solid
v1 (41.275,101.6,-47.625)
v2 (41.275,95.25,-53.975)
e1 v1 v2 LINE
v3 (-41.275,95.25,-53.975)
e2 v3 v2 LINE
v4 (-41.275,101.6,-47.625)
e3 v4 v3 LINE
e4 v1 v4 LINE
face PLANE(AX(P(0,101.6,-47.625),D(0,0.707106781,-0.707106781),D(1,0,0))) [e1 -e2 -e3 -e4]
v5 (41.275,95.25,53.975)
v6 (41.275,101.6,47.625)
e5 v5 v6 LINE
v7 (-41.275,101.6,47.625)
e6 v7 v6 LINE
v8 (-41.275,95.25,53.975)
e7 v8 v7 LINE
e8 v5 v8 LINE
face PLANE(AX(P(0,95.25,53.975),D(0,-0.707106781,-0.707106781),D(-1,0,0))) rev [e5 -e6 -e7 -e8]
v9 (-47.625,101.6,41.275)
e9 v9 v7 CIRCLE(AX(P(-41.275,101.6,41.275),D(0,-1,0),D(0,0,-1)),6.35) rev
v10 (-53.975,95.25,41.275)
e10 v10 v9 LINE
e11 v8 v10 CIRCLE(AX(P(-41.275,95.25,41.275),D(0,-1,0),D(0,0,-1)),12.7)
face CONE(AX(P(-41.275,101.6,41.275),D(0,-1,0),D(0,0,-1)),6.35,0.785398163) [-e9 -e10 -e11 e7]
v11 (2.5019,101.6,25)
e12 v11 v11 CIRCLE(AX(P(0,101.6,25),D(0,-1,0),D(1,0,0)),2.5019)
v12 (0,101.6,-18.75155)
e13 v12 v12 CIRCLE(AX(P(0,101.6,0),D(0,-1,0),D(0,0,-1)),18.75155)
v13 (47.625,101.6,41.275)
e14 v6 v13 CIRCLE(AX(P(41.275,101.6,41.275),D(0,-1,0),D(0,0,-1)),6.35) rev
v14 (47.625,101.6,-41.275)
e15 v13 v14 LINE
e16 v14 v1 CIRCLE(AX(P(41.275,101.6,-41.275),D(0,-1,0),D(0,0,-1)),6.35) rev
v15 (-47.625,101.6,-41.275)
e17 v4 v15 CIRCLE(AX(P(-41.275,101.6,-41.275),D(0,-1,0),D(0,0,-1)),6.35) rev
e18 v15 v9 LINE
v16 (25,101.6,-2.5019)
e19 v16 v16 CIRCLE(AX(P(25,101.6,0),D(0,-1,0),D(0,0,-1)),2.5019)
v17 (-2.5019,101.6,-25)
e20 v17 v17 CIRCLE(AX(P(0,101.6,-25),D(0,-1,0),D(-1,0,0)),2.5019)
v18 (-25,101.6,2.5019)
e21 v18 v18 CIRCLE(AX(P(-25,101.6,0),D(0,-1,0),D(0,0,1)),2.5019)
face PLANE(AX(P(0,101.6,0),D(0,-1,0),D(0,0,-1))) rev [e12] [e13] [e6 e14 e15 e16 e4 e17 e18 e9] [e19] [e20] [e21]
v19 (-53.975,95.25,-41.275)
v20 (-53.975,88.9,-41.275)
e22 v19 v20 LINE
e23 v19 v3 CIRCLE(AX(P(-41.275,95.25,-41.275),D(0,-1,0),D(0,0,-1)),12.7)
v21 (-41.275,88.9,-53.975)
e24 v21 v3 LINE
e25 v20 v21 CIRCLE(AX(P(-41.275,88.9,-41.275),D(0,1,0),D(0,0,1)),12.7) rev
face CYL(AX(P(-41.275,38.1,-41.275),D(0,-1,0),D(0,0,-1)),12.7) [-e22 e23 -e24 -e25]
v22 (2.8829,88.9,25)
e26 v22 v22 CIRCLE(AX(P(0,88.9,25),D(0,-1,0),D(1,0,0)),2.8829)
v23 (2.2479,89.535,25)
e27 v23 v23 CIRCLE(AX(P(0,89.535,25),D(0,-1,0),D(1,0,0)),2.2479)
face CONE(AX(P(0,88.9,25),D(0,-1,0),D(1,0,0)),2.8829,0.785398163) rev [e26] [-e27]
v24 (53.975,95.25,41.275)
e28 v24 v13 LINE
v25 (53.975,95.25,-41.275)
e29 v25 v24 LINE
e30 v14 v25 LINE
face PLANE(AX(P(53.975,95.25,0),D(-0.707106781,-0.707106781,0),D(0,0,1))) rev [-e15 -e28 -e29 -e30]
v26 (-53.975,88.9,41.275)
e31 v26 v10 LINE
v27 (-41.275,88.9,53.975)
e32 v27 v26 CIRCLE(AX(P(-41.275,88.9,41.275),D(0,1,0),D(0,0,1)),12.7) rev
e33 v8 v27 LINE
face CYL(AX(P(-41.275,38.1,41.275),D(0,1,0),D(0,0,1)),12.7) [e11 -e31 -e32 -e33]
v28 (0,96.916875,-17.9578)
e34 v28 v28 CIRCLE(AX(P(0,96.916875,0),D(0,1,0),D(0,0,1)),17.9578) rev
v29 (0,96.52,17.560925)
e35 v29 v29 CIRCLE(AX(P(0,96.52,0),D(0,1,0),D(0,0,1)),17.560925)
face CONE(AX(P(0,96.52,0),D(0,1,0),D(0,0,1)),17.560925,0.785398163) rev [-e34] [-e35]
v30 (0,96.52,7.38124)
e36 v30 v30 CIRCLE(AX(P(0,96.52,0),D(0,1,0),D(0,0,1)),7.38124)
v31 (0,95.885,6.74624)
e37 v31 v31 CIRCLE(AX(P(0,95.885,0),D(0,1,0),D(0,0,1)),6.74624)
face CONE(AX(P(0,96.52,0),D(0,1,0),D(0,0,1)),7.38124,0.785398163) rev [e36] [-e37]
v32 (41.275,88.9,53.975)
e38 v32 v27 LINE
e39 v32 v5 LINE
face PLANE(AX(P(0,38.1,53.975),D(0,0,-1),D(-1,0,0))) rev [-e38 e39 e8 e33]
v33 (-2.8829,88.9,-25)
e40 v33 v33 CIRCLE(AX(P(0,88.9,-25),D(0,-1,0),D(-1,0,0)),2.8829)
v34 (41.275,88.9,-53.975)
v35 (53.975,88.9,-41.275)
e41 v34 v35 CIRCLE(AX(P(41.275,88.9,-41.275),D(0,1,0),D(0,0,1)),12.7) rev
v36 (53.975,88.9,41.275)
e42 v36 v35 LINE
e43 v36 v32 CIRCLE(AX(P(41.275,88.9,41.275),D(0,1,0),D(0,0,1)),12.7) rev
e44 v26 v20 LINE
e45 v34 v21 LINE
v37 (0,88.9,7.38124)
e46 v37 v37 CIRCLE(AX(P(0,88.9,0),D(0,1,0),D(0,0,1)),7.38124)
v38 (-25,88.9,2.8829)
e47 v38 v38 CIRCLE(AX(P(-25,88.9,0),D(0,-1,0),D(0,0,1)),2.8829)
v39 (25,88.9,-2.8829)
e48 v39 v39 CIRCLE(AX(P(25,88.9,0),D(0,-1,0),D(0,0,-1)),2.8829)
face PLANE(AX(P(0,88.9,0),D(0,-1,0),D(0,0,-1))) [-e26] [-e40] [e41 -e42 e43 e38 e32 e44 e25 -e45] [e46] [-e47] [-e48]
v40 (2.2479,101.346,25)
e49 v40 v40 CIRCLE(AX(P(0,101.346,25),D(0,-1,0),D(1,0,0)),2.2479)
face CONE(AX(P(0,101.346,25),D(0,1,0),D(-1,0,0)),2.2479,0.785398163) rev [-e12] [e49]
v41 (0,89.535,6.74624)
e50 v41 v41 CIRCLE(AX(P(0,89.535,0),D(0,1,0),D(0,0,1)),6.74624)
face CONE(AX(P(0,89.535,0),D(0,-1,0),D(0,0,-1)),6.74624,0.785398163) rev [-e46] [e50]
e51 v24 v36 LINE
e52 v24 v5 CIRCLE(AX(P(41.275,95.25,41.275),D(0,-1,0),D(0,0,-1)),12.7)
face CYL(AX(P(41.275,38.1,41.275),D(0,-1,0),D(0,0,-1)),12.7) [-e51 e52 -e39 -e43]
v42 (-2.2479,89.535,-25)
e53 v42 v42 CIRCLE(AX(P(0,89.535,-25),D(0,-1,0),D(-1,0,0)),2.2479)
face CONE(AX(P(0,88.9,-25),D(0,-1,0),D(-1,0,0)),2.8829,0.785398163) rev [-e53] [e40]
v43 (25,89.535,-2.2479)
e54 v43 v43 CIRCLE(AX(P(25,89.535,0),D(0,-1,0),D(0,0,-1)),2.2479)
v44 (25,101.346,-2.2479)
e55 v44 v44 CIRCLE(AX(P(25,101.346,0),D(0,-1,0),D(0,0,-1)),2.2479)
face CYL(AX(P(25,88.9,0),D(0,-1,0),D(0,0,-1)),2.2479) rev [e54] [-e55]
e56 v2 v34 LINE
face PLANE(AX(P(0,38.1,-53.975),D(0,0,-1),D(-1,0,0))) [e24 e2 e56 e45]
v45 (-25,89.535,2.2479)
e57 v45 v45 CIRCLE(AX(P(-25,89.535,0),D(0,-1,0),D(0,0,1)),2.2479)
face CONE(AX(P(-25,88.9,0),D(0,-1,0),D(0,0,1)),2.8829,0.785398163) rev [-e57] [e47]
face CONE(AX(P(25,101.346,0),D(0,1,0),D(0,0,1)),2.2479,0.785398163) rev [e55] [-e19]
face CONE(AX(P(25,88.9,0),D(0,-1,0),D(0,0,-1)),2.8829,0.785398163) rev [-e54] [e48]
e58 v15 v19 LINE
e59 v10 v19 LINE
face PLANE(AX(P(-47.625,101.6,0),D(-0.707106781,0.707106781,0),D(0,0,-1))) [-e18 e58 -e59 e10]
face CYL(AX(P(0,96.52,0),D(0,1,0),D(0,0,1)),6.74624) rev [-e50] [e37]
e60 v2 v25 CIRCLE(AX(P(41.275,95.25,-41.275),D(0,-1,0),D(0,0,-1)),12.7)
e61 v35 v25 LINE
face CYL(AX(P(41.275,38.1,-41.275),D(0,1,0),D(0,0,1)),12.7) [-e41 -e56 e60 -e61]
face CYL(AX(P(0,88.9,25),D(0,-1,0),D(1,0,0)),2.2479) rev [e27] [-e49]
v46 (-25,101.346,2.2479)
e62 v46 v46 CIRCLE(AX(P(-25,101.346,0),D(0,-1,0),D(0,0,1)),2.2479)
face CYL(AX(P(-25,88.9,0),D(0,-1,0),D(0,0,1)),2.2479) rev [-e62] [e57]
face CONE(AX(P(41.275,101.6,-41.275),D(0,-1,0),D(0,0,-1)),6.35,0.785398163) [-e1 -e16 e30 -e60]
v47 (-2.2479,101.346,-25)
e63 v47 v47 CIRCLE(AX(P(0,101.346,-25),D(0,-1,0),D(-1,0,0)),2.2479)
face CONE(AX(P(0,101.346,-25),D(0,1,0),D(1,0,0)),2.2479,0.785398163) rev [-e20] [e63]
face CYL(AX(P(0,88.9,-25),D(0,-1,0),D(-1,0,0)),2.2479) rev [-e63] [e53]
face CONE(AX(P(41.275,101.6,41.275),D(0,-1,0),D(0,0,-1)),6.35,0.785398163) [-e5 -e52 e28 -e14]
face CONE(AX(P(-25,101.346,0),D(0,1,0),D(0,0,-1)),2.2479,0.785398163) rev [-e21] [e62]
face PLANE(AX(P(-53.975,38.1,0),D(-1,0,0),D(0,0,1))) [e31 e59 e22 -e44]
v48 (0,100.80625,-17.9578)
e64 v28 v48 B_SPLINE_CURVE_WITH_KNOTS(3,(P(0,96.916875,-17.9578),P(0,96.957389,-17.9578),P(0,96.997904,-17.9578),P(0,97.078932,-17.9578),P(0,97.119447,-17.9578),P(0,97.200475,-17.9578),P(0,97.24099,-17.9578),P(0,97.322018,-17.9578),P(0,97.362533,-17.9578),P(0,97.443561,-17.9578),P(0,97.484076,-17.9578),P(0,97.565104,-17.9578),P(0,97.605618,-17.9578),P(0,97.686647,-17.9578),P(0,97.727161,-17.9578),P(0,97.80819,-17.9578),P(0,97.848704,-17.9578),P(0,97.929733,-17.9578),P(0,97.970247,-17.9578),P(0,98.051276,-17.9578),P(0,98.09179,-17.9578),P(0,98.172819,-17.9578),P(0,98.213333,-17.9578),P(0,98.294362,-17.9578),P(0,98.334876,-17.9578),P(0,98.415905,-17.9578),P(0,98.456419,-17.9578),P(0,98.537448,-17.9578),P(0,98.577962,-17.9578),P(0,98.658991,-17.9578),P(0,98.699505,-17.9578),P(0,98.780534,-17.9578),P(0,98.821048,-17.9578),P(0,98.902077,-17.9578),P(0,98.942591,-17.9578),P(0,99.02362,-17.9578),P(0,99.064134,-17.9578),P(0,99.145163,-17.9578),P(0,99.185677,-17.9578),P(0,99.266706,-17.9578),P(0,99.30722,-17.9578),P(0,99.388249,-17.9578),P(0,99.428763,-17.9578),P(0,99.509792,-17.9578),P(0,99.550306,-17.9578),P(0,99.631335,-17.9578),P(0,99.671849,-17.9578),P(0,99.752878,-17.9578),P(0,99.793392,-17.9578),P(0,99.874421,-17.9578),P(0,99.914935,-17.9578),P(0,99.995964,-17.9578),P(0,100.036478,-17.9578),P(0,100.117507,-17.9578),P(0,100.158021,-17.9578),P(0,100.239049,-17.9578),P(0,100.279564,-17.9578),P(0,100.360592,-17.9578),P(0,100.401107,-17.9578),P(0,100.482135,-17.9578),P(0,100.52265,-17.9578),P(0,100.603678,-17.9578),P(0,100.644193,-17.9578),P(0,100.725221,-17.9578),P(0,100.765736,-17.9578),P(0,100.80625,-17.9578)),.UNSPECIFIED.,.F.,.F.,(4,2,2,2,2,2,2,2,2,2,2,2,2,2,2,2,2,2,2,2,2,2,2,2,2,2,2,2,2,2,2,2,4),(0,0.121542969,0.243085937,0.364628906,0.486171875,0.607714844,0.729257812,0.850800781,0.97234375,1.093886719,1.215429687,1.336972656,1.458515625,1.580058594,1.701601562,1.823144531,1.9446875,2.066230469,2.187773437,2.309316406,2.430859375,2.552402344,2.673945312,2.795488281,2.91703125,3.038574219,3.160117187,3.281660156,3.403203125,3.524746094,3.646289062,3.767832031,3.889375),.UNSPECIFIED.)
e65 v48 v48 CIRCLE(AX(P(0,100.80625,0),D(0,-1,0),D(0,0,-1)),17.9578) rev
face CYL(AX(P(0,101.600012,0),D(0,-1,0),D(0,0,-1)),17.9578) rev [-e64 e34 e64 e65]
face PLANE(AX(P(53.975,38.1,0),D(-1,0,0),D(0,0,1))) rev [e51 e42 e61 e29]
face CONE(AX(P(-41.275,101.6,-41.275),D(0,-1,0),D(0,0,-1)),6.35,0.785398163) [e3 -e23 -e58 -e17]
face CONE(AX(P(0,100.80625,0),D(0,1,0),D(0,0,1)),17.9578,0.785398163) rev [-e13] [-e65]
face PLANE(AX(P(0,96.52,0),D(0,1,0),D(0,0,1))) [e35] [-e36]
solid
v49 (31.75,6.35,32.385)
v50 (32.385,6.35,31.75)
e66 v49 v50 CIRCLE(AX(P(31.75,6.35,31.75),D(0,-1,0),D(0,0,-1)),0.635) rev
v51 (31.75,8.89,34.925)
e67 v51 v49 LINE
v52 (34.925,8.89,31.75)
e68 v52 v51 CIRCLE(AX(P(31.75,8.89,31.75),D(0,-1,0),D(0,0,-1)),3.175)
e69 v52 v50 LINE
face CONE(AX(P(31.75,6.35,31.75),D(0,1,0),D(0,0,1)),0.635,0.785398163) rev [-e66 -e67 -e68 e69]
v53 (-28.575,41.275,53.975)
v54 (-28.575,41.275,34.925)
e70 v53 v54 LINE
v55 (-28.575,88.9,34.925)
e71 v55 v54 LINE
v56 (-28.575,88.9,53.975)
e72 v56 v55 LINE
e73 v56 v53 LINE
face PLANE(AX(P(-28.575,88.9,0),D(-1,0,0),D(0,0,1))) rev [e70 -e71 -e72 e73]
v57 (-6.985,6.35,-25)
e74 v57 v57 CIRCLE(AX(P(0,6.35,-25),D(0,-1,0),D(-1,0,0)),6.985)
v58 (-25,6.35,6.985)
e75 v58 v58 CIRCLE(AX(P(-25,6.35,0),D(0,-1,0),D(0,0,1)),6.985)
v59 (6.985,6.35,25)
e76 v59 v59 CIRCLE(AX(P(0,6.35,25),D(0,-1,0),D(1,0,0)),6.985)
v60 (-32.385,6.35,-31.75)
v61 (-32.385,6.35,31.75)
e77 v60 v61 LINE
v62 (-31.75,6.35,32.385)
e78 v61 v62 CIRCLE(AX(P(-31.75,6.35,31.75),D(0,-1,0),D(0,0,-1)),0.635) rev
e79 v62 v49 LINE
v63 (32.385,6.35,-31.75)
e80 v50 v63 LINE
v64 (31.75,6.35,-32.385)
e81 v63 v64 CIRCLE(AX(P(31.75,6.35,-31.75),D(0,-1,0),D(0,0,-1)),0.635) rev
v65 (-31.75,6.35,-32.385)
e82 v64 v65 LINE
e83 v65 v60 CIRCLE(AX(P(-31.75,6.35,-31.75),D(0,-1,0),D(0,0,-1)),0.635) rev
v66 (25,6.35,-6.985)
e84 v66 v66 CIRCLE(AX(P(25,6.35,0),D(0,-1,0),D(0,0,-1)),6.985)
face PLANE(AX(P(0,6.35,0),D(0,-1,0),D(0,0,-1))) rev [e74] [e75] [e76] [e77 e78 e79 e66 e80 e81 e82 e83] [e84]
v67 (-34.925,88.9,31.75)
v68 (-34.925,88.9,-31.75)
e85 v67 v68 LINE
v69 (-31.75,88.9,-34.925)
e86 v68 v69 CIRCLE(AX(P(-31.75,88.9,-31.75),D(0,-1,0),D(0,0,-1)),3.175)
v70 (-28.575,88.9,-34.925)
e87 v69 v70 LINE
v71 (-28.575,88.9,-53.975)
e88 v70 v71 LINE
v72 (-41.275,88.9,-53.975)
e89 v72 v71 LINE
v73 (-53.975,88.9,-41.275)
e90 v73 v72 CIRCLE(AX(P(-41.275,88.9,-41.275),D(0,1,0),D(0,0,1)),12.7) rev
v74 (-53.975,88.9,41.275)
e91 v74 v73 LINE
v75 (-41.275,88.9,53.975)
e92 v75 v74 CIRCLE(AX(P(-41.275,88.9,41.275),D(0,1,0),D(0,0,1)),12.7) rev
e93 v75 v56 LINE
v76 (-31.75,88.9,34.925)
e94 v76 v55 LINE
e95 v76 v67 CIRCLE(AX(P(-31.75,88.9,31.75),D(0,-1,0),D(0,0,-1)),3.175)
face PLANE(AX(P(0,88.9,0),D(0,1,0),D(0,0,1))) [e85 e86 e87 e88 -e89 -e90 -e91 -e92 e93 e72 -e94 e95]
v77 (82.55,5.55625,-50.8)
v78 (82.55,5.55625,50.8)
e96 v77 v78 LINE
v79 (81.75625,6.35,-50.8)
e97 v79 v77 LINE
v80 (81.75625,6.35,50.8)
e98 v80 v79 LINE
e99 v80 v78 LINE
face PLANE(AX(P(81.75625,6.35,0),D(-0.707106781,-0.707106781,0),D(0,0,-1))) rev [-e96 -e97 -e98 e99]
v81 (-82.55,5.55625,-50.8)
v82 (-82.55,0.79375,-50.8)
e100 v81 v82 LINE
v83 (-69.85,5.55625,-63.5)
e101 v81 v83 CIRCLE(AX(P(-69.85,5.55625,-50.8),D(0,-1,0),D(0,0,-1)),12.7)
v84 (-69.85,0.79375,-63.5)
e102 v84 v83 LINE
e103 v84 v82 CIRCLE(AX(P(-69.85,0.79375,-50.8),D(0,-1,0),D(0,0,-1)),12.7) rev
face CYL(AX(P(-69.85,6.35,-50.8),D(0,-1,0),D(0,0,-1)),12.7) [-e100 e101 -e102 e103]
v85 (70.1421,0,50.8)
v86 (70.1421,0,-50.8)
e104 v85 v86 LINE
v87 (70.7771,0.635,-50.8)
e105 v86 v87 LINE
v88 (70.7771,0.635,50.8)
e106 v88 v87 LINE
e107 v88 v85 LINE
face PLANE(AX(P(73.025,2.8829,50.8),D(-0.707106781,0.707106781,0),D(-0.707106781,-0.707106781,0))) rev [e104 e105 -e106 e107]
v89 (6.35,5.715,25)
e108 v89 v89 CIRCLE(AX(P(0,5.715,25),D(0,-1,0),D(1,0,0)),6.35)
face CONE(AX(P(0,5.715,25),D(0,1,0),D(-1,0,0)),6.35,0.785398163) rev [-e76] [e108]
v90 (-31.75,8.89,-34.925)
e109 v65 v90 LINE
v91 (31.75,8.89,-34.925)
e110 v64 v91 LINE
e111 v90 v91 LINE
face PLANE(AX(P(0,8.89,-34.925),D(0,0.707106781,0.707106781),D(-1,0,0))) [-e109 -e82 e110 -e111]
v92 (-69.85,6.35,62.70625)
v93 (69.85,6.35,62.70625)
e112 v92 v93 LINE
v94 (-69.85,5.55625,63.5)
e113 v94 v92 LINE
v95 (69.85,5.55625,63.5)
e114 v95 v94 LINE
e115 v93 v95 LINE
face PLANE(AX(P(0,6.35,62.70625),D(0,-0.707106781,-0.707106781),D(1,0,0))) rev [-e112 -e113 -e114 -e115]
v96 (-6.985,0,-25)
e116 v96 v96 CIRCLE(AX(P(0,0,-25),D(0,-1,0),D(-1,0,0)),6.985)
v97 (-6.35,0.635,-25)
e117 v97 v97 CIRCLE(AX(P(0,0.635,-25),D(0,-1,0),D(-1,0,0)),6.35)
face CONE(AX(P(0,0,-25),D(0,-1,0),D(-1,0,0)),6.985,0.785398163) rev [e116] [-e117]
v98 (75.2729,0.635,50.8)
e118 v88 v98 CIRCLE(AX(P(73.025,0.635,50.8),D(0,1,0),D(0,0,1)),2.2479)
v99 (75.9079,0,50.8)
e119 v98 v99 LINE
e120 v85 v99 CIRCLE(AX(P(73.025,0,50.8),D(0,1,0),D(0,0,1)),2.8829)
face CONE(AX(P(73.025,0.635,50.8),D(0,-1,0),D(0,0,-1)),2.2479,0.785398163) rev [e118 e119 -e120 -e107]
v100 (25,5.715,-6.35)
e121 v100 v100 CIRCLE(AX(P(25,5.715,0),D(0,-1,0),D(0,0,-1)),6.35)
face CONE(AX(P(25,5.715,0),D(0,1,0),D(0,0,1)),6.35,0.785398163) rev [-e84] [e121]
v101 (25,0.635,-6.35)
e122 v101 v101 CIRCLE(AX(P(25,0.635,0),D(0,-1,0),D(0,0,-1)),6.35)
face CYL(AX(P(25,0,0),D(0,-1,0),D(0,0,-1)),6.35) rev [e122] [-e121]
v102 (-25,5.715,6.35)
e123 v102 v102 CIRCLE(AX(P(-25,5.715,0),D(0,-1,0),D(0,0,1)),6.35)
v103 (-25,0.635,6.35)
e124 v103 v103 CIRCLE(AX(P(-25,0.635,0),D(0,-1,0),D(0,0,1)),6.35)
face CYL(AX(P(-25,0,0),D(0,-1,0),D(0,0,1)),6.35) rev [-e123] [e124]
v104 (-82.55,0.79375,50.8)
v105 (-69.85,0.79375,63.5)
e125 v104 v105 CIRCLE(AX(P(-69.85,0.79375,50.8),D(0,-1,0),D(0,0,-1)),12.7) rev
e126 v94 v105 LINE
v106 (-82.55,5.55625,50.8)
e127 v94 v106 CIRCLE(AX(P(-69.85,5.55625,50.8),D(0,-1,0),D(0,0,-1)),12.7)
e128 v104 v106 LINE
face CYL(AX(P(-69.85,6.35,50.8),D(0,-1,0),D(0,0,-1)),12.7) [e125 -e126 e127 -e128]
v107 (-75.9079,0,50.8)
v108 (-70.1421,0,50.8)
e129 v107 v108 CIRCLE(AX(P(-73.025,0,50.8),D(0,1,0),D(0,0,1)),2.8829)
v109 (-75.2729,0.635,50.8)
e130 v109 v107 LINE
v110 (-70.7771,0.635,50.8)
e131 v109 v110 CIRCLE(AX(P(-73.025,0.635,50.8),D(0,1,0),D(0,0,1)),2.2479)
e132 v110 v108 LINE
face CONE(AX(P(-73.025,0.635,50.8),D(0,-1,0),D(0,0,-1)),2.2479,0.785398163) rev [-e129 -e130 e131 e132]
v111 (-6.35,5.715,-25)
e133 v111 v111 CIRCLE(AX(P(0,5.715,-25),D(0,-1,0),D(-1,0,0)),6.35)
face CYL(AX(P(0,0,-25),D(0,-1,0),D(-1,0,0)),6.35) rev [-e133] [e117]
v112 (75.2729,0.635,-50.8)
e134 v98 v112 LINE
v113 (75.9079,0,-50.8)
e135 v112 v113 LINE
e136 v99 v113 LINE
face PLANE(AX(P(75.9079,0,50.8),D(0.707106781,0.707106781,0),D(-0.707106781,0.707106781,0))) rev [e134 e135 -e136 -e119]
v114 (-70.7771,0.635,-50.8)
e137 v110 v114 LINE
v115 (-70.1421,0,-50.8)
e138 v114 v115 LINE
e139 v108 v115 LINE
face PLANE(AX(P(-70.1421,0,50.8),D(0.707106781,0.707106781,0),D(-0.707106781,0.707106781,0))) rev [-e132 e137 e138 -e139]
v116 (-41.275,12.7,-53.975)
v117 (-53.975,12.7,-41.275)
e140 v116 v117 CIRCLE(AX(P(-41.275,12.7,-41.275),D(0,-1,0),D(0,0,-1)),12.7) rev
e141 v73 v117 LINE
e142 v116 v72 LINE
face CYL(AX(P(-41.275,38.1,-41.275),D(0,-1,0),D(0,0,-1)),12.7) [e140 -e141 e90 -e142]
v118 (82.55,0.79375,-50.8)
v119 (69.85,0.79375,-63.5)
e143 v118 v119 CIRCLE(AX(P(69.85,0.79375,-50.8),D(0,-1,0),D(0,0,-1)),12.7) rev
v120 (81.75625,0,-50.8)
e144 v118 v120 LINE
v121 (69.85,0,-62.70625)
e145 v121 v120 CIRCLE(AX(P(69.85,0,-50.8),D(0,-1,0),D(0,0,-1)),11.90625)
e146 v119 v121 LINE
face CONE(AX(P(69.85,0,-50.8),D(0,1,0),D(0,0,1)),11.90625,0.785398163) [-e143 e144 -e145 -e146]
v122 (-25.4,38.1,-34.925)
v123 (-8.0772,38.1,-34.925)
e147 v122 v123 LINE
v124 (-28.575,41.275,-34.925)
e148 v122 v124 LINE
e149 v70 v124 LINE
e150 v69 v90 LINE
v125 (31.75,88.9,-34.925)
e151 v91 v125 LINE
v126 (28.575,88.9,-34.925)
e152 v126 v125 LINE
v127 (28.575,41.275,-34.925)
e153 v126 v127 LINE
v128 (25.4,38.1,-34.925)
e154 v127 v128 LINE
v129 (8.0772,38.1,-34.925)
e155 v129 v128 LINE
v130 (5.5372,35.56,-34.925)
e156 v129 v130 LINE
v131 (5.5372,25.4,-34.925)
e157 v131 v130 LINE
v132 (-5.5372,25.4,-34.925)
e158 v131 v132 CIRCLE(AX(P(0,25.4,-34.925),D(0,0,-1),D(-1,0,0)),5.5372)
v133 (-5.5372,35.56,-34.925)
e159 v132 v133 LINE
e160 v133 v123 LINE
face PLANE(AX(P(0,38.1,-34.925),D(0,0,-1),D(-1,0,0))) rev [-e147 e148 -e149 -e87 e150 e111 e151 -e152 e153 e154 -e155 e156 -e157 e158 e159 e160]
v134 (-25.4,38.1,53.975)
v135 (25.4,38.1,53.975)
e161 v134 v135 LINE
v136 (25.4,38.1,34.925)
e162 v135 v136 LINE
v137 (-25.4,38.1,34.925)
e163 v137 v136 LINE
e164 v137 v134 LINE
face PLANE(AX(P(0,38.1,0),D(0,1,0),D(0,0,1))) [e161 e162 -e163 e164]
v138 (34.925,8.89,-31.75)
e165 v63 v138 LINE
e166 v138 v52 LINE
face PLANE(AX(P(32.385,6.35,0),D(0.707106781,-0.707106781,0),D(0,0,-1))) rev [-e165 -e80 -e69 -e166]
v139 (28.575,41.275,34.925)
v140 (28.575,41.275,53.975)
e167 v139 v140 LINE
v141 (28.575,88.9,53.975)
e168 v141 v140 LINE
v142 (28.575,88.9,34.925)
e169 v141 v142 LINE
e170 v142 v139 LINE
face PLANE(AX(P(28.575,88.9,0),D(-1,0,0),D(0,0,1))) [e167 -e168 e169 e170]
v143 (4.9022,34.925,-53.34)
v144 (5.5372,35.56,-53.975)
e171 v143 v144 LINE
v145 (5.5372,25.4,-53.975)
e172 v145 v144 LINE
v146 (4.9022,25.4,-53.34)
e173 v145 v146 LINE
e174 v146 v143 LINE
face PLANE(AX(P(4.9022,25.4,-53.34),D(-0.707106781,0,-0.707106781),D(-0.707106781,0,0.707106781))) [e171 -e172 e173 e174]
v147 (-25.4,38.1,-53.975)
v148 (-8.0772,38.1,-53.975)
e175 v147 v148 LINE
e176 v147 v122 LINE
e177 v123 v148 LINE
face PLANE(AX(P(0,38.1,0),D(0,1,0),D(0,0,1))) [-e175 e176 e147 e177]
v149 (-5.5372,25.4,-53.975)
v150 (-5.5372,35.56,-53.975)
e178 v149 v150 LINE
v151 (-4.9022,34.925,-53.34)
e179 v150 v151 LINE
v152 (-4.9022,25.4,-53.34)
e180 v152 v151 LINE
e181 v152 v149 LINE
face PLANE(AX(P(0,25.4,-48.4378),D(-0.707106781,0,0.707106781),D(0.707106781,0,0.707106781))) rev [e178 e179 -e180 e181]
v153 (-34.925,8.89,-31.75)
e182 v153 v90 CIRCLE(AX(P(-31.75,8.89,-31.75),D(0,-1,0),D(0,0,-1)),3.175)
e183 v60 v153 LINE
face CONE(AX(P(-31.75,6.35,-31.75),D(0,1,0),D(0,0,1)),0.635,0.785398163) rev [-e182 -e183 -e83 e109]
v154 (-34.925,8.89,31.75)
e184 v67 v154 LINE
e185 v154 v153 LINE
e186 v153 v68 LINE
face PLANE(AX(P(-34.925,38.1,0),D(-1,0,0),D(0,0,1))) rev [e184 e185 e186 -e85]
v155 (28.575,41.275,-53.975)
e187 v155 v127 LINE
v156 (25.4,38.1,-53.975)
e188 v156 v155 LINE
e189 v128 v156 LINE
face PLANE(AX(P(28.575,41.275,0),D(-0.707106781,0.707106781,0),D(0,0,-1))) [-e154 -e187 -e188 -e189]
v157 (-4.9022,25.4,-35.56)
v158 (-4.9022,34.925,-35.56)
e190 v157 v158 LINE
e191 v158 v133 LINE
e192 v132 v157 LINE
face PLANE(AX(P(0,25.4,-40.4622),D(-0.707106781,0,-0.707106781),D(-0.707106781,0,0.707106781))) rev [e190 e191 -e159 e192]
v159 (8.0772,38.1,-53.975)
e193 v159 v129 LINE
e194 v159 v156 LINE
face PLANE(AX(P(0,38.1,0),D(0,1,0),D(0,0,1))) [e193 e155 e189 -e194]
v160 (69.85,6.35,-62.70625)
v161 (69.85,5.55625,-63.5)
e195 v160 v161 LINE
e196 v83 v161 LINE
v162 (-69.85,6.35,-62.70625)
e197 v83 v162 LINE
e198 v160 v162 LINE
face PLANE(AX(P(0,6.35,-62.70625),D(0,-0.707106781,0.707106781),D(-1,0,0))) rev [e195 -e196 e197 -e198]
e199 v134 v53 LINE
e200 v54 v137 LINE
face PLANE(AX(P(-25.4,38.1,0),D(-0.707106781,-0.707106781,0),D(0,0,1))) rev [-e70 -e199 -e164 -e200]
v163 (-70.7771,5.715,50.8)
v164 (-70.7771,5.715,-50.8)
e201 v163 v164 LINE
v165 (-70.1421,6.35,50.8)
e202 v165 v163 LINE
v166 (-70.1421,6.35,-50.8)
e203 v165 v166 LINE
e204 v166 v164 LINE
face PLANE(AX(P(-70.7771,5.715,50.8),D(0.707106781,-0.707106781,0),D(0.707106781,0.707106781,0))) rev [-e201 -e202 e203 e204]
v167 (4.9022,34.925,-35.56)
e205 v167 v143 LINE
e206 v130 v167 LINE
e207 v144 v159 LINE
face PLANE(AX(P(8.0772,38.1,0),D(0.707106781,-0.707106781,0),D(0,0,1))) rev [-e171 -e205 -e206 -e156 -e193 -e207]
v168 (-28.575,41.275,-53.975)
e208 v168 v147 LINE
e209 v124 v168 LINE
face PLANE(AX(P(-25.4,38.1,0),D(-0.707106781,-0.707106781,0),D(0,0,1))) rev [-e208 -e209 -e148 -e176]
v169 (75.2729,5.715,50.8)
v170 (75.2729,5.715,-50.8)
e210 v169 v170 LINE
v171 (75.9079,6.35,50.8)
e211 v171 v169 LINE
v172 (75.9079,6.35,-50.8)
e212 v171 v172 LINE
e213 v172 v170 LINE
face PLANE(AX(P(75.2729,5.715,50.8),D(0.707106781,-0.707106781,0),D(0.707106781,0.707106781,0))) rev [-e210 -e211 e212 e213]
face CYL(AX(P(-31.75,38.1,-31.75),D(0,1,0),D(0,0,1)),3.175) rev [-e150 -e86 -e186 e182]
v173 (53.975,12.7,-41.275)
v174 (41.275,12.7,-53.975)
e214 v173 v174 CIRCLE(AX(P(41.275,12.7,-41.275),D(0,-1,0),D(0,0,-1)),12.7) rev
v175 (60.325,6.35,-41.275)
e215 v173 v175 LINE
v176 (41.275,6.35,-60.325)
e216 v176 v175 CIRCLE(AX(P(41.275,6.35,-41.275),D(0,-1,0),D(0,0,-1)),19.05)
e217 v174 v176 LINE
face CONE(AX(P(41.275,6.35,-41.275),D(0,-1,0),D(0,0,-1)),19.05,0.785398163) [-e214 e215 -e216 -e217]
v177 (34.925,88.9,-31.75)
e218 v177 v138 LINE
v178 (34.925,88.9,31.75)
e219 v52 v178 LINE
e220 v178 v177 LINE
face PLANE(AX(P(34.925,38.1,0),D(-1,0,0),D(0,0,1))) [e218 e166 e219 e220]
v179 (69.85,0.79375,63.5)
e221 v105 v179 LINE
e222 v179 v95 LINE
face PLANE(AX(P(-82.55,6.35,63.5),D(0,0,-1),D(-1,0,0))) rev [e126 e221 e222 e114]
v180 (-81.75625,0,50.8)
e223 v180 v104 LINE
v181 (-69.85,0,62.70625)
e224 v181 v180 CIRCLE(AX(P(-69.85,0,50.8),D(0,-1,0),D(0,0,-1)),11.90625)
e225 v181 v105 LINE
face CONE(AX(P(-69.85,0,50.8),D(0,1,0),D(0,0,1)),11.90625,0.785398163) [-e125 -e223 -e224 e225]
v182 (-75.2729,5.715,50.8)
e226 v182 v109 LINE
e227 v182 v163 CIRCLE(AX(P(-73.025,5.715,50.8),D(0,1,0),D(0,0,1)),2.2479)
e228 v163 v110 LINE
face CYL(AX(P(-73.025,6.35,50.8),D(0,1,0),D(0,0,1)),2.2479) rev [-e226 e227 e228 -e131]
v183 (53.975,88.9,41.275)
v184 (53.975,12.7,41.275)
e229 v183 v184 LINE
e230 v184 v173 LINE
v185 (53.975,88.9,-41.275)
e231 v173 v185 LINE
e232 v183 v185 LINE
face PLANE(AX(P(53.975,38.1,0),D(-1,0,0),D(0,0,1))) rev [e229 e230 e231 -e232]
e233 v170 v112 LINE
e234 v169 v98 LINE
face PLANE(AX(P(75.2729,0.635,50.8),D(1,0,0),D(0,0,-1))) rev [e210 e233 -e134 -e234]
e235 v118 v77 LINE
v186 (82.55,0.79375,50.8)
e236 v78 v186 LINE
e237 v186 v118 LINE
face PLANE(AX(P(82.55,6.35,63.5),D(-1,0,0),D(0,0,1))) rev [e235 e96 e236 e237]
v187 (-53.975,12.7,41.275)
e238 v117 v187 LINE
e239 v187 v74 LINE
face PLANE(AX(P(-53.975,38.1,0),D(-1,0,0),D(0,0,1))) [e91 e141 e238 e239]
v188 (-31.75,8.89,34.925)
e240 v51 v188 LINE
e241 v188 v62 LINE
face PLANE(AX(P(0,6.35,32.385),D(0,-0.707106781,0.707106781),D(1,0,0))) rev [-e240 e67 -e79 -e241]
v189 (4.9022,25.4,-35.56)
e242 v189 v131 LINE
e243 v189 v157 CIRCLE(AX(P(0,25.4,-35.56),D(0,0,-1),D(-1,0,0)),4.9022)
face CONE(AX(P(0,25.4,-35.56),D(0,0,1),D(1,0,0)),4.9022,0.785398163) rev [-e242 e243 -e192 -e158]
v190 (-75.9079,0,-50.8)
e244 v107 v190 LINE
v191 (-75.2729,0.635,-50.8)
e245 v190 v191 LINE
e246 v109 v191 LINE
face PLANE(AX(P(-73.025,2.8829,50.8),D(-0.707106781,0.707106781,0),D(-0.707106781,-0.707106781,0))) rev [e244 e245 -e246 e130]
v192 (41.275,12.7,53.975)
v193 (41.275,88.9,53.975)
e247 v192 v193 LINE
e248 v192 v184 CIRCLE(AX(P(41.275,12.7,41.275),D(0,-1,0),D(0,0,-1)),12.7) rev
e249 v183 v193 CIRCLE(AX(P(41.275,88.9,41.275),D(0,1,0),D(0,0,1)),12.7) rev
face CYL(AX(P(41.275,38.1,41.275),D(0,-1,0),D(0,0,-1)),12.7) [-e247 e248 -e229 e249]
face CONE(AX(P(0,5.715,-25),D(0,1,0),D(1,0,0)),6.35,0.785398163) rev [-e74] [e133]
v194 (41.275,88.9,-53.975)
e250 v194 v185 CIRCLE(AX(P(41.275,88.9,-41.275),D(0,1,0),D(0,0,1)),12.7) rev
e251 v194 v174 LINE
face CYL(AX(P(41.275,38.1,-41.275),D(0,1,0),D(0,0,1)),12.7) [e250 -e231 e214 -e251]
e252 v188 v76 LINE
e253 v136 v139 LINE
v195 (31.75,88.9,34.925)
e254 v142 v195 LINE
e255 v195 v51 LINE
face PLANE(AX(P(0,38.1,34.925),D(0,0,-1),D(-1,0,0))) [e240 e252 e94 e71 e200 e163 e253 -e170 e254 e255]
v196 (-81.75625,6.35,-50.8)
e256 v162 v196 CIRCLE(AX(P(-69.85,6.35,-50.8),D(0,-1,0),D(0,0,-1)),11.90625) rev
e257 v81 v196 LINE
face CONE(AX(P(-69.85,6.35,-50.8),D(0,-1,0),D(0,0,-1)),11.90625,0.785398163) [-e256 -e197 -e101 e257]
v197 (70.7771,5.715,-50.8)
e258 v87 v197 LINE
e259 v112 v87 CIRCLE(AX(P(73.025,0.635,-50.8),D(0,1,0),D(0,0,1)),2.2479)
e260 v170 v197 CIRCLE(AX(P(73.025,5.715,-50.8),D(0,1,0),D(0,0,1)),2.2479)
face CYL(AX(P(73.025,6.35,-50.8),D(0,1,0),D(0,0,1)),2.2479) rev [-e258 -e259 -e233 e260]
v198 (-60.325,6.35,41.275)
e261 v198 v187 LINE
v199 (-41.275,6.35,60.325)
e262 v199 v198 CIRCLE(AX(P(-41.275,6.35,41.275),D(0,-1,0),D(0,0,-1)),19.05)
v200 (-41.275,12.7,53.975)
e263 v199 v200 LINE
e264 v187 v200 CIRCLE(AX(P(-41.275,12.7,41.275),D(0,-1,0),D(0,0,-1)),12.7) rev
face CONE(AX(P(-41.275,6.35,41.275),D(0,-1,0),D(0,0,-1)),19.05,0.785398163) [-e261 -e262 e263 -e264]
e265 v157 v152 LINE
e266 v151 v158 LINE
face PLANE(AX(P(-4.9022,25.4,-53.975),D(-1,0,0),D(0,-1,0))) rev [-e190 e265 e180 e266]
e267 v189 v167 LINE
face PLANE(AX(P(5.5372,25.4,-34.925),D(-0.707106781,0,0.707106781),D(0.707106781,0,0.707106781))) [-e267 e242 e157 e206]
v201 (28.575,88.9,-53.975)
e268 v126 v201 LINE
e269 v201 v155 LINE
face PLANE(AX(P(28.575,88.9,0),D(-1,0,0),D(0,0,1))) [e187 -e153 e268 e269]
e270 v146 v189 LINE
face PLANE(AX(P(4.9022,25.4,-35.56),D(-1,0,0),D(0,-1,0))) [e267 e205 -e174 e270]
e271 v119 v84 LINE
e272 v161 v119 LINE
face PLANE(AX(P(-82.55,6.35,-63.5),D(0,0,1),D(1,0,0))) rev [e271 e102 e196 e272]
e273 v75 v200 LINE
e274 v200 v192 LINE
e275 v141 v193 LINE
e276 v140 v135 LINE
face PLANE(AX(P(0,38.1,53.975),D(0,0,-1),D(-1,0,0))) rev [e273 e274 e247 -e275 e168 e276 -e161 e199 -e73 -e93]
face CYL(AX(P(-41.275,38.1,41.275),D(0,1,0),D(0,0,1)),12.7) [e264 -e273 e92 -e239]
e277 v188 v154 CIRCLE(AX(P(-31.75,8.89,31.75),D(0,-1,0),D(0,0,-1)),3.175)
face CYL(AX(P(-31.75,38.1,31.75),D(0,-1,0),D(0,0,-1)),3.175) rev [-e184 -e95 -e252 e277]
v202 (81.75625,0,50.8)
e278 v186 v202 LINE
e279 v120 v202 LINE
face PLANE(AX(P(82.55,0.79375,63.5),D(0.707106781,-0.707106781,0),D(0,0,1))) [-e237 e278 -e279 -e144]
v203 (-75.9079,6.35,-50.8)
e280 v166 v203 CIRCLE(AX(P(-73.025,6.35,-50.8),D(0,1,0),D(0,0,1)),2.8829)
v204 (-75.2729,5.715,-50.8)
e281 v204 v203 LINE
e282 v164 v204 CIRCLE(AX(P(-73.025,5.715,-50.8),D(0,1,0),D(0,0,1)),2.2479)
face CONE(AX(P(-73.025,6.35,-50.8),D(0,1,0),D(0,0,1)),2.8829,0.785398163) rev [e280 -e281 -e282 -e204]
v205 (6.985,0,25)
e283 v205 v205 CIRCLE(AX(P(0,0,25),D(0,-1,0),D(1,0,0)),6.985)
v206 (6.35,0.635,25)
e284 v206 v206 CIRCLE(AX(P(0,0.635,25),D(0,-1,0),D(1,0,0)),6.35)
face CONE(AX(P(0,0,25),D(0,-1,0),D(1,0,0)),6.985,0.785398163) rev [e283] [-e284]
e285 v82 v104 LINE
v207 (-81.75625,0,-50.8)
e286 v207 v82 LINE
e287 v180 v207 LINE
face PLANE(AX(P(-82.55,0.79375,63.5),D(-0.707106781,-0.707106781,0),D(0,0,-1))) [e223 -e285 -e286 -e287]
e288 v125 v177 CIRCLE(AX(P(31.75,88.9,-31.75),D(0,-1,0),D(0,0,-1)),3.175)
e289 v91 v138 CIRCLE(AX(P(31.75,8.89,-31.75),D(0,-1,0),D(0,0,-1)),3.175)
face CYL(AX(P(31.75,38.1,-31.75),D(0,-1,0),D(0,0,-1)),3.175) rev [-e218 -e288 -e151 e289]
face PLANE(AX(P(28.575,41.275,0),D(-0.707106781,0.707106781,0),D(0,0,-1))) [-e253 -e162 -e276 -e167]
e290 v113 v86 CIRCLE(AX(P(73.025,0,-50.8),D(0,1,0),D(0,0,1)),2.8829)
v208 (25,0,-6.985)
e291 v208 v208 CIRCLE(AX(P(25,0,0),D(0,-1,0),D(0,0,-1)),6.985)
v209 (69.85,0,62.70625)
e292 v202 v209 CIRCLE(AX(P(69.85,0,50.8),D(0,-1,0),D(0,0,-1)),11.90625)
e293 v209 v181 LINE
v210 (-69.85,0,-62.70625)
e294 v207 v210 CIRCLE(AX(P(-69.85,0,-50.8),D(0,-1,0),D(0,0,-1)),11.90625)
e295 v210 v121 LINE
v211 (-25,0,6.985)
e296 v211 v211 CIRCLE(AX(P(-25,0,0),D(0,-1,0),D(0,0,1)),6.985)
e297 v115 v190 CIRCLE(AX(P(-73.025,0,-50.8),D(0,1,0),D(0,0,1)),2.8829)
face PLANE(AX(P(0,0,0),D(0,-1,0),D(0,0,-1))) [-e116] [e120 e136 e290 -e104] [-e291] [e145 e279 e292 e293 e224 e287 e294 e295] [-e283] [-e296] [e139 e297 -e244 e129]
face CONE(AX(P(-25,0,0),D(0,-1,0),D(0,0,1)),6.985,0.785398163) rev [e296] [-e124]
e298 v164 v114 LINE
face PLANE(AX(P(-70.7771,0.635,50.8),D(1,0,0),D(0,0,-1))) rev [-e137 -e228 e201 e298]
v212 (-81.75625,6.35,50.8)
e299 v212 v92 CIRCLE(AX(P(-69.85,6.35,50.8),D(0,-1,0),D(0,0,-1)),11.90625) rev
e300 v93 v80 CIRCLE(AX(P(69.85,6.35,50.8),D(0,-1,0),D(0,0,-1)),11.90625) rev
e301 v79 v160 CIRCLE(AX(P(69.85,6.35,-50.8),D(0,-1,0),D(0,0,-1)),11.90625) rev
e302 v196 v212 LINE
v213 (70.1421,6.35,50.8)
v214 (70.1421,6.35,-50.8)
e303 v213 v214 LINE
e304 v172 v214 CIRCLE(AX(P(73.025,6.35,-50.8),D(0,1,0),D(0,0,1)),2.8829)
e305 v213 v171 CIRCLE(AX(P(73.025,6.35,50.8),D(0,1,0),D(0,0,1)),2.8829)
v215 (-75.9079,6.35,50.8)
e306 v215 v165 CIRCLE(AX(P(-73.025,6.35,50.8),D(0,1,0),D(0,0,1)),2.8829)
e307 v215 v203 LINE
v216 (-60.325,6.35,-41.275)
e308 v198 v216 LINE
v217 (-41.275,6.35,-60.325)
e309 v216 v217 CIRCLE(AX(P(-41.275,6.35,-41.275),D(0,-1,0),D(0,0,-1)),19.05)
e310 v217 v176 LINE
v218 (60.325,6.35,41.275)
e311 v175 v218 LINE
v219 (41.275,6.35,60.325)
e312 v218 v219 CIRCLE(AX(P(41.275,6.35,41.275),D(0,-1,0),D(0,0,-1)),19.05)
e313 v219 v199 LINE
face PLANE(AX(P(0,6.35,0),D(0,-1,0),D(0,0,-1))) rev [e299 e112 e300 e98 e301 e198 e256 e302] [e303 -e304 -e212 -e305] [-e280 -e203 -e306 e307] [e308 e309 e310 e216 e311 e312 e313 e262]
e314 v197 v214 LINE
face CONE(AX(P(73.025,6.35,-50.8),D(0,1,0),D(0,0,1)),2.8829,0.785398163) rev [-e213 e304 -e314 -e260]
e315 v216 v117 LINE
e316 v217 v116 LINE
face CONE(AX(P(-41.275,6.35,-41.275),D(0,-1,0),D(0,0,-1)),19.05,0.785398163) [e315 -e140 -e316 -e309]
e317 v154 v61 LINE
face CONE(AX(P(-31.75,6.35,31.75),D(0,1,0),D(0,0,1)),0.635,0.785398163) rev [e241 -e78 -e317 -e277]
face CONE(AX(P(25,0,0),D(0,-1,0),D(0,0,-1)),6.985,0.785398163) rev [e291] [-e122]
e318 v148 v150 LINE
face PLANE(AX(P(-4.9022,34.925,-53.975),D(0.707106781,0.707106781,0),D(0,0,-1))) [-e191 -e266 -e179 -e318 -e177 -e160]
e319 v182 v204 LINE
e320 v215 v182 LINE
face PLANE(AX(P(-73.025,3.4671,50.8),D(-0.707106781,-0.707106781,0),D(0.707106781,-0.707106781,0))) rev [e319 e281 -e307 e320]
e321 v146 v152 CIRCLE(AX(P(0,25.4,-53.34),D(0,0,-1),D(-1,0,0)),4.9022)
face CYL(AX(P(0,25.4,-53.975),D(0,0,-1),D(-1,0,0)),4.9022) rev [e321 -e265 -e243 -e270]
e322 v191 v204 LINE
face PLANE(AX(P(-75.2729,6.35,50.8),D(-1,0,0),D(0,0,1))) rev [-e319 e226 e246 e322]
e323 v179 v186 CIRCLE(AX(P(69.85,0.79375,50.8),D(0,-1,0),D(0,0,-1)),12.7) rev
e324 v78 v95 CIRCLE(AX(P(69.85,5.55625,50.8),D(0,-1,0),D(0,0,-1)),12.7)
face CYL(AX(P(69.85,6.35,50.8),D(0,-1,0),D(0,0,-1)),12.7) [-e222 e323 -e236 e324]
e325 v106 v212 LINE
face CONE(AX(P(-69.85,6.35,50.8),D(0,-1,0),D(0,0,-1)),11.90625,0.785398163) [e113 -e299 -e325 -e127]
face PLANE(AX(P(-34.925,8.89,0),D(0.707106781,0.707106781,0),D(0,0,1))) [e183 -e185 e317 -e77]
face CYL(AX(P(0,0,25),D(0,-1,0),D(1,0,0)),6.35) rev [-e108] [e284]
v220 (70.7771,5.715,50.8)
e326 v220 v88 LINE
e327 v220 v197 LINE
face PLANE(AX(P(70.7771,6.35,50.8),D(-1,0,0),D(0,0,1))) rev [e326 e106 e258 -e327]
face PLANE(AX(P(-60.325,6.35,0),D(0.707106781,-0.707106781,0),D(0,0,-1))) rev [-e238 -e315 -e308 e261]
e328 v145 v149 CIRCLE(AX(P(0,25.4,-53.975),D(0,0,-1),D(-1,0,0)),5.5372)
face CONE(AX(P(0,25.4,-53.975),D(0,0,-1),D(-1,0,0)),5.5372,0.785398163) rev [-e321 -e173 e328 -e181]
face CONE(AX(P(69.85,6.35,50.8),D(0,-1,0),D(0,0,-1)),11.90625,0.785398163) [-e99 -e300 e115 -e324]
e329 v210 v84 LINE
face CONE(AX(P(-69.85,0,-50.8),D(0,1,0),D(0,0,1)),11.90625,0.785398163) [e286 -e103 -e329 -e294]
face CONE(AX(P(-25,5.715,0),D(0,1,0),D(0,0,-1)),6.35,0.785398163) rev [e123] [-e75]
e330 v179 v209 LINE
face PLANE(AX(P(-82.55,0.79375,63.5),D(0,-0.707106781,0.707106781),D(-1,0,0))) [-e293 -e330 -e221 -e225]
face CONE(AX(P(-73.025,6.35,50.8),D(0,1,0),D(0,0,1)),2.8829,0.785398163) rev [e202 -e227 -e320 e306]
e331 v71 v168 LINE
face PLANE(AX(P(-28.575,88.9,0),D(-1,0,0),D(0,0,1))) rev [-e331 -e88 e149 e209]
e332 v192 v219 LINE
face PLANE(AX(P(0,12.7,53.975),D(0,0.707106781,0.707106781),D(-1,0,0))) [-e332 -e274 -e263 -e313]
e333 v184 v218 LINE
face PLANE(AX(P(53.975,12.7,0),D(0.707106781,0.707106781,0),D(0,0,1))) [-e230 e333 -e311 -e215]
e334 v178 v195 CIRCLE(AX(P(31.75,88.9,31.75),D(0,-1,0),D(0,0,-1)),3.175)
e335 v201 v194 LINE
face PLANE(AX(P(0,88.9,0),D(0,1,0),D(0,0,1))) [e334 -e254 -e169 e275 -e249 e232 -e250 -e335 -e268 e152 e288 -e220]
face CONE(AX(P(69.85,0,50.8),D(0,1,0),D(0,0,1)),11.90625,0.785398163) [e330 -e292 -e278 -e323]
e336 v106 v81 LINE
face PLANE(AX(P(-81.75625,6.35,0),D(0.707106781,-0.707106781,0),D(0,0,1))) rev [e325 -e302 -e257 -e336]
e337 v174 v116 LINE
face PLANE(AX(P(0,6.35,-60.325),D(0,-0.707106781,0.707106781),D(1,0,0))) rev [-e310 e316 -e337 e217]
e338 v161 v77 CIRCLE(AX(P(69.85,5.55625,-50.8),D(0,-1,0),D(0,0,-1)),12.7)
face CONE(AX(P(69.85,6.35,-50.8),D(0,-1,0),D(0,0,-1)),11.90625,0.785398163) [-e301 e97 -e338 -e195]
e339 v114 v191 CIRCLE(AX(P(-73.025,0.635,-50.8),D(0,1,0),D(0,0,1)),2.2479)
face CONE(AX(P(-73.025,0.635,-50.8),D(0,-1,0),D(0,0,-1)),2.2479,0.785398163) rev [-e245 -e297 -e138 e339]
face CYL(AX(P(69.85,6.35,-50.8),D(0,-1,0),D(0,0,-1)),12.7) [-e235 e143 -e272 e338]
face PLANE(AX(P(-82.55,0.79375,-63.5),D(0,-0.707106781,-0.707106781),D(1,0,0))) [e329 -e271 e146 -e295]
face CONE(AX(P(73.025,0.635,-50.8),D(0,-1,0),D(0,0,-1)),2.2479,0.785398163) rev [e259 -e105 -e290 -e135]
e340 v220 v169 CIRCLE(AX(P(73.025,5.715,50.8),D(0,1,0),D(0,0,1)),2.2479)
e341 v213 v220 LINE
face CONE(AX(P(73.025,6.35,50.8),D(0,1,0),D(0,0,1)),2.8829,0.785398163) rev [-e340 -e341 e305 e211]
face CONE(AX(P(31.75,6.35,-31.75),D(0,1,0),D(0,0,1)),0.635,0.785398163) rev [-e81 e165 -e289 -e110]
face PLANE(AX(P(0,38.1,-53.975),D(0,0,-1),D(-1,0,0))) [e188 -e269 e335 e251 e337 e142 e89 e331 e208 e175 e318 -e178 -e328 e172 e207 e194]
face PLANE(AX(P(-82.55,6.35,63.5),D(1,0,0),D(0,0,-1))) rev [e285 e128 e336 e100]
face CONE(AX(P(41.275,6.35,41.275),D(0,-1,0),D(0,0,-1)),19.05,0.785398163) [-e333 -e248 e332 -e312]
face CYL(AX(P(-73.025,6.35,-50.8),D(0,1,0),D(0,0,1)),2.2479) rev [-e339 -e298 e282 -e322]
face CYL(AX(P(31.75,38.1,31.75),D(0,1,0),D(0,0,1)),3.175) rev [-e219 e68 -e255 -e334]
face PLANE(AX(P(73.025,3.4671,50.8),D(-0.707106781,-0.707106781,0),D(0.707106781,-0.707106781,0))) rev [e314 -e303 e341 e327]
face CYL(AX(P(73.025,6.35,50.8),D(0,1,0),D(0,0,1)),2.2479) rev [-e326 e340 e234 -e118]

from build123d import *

# Parameters (mm, degrees)
SKETCH1_W                   = 165.1
SKETCH1_H                   = 127
BOSS_EXTRUDE1_DEPTH         = 6.35
SKETCH2_W                   = 57.15
SKETCH2_H                   = 19.05
BOSS_EXTRUDE2_DEPTH         = 38.1
BOSS_EXTRUDE3_DEPTH         = 88.9
BOSS_EXTRUDE4_START         = 88.9
SKETCH2_4_W                 = 57.15
SKETCH2_4_H                 = 19.05
SKETCH2_4_W_2               = 69.85
SKETCH2_4_H_2               = 69.85
BOSS_EXTRUDE4_DEPTH         = 12.7
CUT_EXTRUDE1_DEPTH          = 146.496778315
CUT_EXTRUDE1_DEPTH_BACK     = 5.08
SKETCH7_R                   = 17.9578
F_8_START                   = -50.8
F_8_CLEARANCE_SLOT1_2_DEPTH = 101.6
CIRPATTERN1_COUNT           = 4
F_3_8_START                 = 25.4
F_3_8_CLEARANCE_SLOT1_DEPTH = 12.7
FILLET2_R                   = 3.175
FILLET1_R                   = 12.7
CHAMFER1_SIZE               = 2.54
CHAMFER8_SIZE               = 6.35
CHAMFER2_SIZE               = 6.35
CHAMFER9_SIZE               = 3.175
CHAMFER3_SIZE               = 0.79375
CHAMFER5_SIZE               = 0.79375
CHAMFER6_SIZE               = 0.396875


with BuildPart() as part:
    # Sketch1 → Boss-Extrude1 (new body)
    with BuildSketch(Plane(origin=(0, 0, 0), x_dir=(1, 0, 0), z_dir=(0, 1, 0))):
        Rectangle(SKETCH1_W, SKETCH1_H)
    extrude(amount=BOSS_EXTRUDE1_DEPTH)

    # Sketch2 → Boss-Extrude2 (add)
    with BuildSketch(Plane(origin=(0, 0, 0), x_dir=(1, 0, 0), z_dir=(0, 1, 0))):
        Polygon((-28.575, 53.975), (-53.975, 53.975), (-53.975, -53.975), (-28.575, -53.975), (-28.575, -34.925), (-34.925, -34.925), (-34.925, 34.925), (-28.575, 34.925), align=None)
        with Locations((0, 44.45)):
            Rectangle(SKETCH2_W, SKETCH2_H)
        Polygon((53.975, 53.975), (28.575, 53.975), (28.575, 34.925), (34.925, 34.925), (34.925, -34.925), (28.575, -34.925), (28.575, -53.975), (53.975, -53.975), align=None)
        with Locations((0, -44.45)):
            Rectangle(SKETCH2_W, SKETCH2_H)
    extrude(amount=BOSS_EXTRUDE2_DEPTH)

    # Sketch2<3> → Boss-Extrude3 (add)
    with BuildSketch(Plane(origin=(0, 0, 0), x_dir=(1, 0, 0), z_dir=(0, 1, 0))):
        Polygon((-28.575, 53.975), (-53.975, 53.975), (-53.975, -53.975), (-28.575, -53.975), (-28.575, -34.925), (-34.925, -34.925), (-34.925, 34.925), (-28.575, 34.925), align=None)
        Polygon((53.975, 53.975), (28.575, 53.975), (28.575, 34.925), (34.925, 34.925), (34.925, -34.925), (28.575, -34.925), (28.575, -53.975), (53.975, -53.975), align=None)
    extrude(amount=BOSS_EXTRUDE3_DEPTH)

    # Sketch2<4> → Boss-Extrude4 (add)
    with BuildSketch(Plane(origin=(0, 0, 0), x_dir=(1, 0, 0), z_dir=(0, 1, 0)).offset(BOSS_EXTRUDE4_START)):
        with Locations((0, 44.45)):
            Rectangle(SKETCH2_4_W, SKETCH2_4_H)
        Polygon((-28.575, 53.975), (-53.975, 53.975), (-53.975, -53.975), (-28.575, -53.975), (-28.575, -34.925), (-34.925, -34.925), (-34.925, 34.925), (-28.575, 34.925), align=None)
        with Locations((0, -44.45)):
            Rectangle(SKETCH2_4_W, SKETCH2_4_H)
        Polygon((53.975, 53.975), (28.575, 53.975), (28.575, 34.925), (34.925, 34.925), (34.925, -34.925), (28.575, -34.925), (28.575, -53.975), (53.975, -53.975), align=None)
        Rectangle(SKETCH2_4_W_2, SKETCH2_4_H_2)
    extrude(amount=BOSS_EXTRUDE4_DEPTH)

    # Sketch7 → Cut-Extrude1 (cut, two sides: drawn at the far end of the back side and taken through both)
    with BuildSketch(Plane(origin=(0, 101.6, 0), x_dir=(1, 0, 0), z_dir=(0, 1, 0)).offset(-CUT_EXTRUDE1_DEPTH_BACK)):
        with Locations(Location((0, 0, 0), (0, 0, 90))):
            Circle(SKETCH7_R)
    extrude(amount=CUT_EXTRUDE1_DEPTH + CUT_EXTRUDE1_DEPTH_BACK, mode=Mode.SUBTRACT)

    # Sketch19 → 1/2 Clearance Hole1 (revolve, cut)
    with BuildSketch(Plane(origin=(0, 96.52, 0), x_dir=(0, 0, 1), z_dir=(1, 0, 0))):
        Polygon((0, 0), (0, 7.62), (7.38124, 7.62), (6.74624, 6.985), (6.74624, 0.635), (7.38124, 0), align=None)
    revolve(axis=Axis((0, 102.87, 0), (0, -1, 0)), mode=Mode.SUBTRACT)

    # #8 Clearance Slot1: read off the stored shape, not the designer's step
    # #8 Clearance Slot1 outline → #8 Clearance Slot1 (revolve, cut)
    with BuildSketch(Plane(origin=(73.025, 0, -50.8), x_dir=(1, 0, 0), z_dir=(0, 0, 1))):
        Polygon((0, 0), (2.8829, 0), (2.2479, 0.635), (2.2479, 5.715), (2.8829, 6.35), (0, 6.35), align=None)
    revolve(axis=Axis((73.025, 0, -50.8), (0, 1, 0)), mode=Mode.SUBTRACT)

    # 8 Clearance Slot1 2 outline → 8 Clearance Slot1 2 (cut)
    with BuildSketch(Plane.XY.offset(F_8_START)):
        Polygon((75.9079, 6.35), (70.1421, 6.35), (70.7771, 5.715), (70.7771, 0.635), (70.1421, 0), (75.9079, 0), (75.2729, 0.635), (75.2729, 5.715), align=None)
        Polygon((-70.7771, 5.715), (-70.1421, 6.35), (-75.9079, 6.35), (-75.2729, 5.715), (-75.2729, 0.635), (-75.9079, 0), (-70.1421, 0), (-70.7771, 0.635), align=None)
    extrude(amount=F_8_CLEARANCE_SLOT1_2_DEPTH, mode=Mode.SUBTRACT)

    # 8 Clearance Slot1 3 outline → 8 Clearance Slot1 3 (revolve, cut)
    with BuildSketch(Plane(origin=(73.025, 0, 50.8), x_dir=(1, 0, 0), z_dir=(0, 0, 1))):
        Polygon((0, 0), (2.8829, 0), (2.2479, 0.635), (2.2479, 5.715), (2.8829, 6.35), (0, 6.35), align=None)
    revolve(axis=Axis((73.025, 0, 50.8), (0, 1, 0)), mode=Mode.SUBTRACT)

    # 8 Clearance Slot1 4 outline → 8 Clearance Slot1 4 (revolve, cut)
    with BuildSketch(Plane(origin=(-73.025, 0, -50.8), x_dir=(1, 0, 0), z_dir=(0, 0, 1))):
        Polygon((0, 0), (2.8829, 0), (2.2479, 0.635), (2.2479, 5.715), (2.8829, 6.35), (0, 6.35), align=None)
    revolve(axis=Axis((-73.025, 0, -50.8), (0, 1, 0)), mode=Mode.SUBTRACT)

    # 8 Clearance Slot1 5 outline → 8 Clearance Slot1 5 (revolve, cut)
    with BuildSketch(Plane(origin=(-73.025, 0, 50.8), x_dir=(1, 0, 0), z_dir=(0, 0, 1))):
        Polygon((0, 0), (2.8829, 0), (2.2479, 0.635), (2.2479, 5.715), (2.8829, 6.35), (0, 6.35), align=None)
    revolve(axis=Axis((-73.025, 0, 50.8), (0, 1, 0)), mode=Mode.SUBTRACT)

    # Sketch11 → 1/2 (0.5) Diameter Hole1 (revolve, cut)
    with BuildSketch(Plane(origin=(25, 0, 0), x_dir=(0, 0, -1), z_dir=(1, 0, 0))):
        Polygon((0, 0), (0, 6.35), (6.985, 6.35), (6.35, 5.715), (6.35, 0.635), (6.985, 0), align=None)
    f_1_2_0_5_diameter_hole1 = revolve(axis=Axis((25, -6.35, 0), (0, 1, 0)), mode=Mode.SUBTRACT)

    # Sketch13 → #8 Clearance Hole2 (revolve, cut)
    with BuildSketch(Plane(origin=(25, 88.9, 0), x_dir=(0, 0, -1), z_dir=(1, 0, 0))):
        Polygon((0, 0), (0, 12.7), (2.5019, 12.7), (2.2479, 12.446), (2.2479, 0.635), (2.8829, 0), align=None)
    f_8_clearance_hole2 = revolve(axis=Axis((25, 82.55, 0), (0, 1, 0)), mode=Mode.SUBTRACT)

    # CirPattern1: 1/2 (0.5) Diameter Hole1, #8 Clearance Hole2 ×4 about axis
    cirpattern1_axis = Axis((0, 0, 0), (0, 1, 0))
    add([f_1_2_0_5_diameter_hole1.rotate(cirpattern1_axis, i * 360 / CIRPATTERN1_COUNT) for i in range(1, CIRPATTERN1_COUNT)], mode=Mode.SUBTRACT)
    add([f_8_clearance_hole2.rotate(cirpattern1_axis, i * 360 / CIRPATTERN1_COUNT) for i in range(1, CIRPATTERN1_COUNT)], mode=Mode.SUBTRACT)

    # 3/8 Clearance Slot1: read off the stored shape, not the designer's step
    # 3/8 Clearance Slot1 outline → 3/8 Clearance Slot1 (cut)
    with BuildSketch(Plane(origin=(0, 0, 0), x_dir=(1, 0, 0), z_dir=(0, 1, 0)).offset(F_3_8_START)):
        Polygon((4.9022, 53.34), (5.5372, 53.975), (-5.5372, 53.975), (-4.9022, 53.34), (-4.9022, 35.56), (-5.5372, 34.925), (5.5372, 34.925), (4.9022, 35.56), align=None)
    extrude(amount=F_3_8_CLEARANCE_SLOT1_DEPTH, mode=Mode.SUBTRACT)

    # 3_8 Clearance Slot1 2 outline → 3_8 Clearance Slot1 2 (revolve, cut)
    with BuildSketch(Plane.XZ.offset(-25.4)):
        Polygon((5.5372, -34.925), (0, -34.925), (0, -53.975), (5.5372, -53.975), (4.9022, -53.34), (4.9022, -35.56), align=None)
    revolve(axis=Axis((0, 25.4, 0), (0, 0, 1)), mode=Mode.SUBTRACT)

    # Fillet2
    fillet2_edges = [part.edges().sort_by_distance(p)[0] for p in [
        (-34.925, 47.625, -34.925),
        (34.925, 47.625, -34.925),
        (34.925, 47.625, 34.925),
        (-34.925, 47.625, 34.925),
    ]]
    fillet(fillet2_edges, radius=FILLET2_R)

    # Fillet1
    fillet1_edges = [part.edges().sort_by_distance(p)[0] for p in [
        (53.975, 53.975, 53.975),
        (53.975, 53.975, -53.975),
        (-53.975, 53.975, -53.975),
        (-53.975, 53.975, 53.975),
        (82.55, 3.175, 63.5),
        (-82.55, 3.175, 63.5),
        (-82.55, 3.175, -63.5),
        (82.55, 3.175, -63.5),
    ]]
    fillet(fillet1_edges, radius=FILLET1_R)

    # Chamfer1
    chamfer1_edges = [part.edges().sort_by_distance(p)[0] for p in [
        (0, 6.35, -34.925),
        (-34.925, 6.35, 0),
        (0, 6.35, 34.925),
        (34.925, 6.35, 0),
        (33.99506403, 6.35, 33.99506403),
        (-33.99506403, 6.35, 33.99506403),
        (33.99506403, 6.35, -33.99506403),
        (-33.99506403, 6.35, -33.99506403),
    ]]
    chamfer(chamfer1_edges, length=CHAMFER1_SIZE)

    # Chamfer8
    chamfer8_edges = [part.edges().sort_by_distance(p)[0] for p in [
        (53.975, 6.35, 0),
        (0, 6.35, 53.975),
        (-53.975, 6.35, 0),
        (0, 6.35, -53.975),
        (-50.255256121, 6.35, -50.255256121),
        (50.255256121, 6.35, -50.255256121),
        (50.255256121, 6.35, 50.255256121),
        (-50.255256121, 6.35, 50.255256121),
    ]]
    chamfer(chamfer8_edges, length=CHAMFER8_SIZE)

    # Chamfer2
    chamfer2_edges = [part.edges().sort_by_distance(p)[0] for p in [
        (-53.975, 101.6, 0),
        (0, 101.6, -53.975),
        (0, 101.6, 53.975),
        (53.975, 101.6, 0),
        (-50.255256121, 101.6, 50.255256121),
        (50.255256121, 101.6, 50.255256121),
        (50.255256121, 101.6, -50.255256121),
        (-50.255256121, 101.6, -50.255256121),
    ]]
    chamfer(chamfer2_edges, length=CHAMFER2_SIZE)

    # Chamfer9
    chamfer9_edges = [part.edges().sort_by_distance(p)[0] for p in [
        (28.575, 38.1, -44.45),
        (28.575, 38.1, 44.45),
        (-4.9022, 38.1, -44.45),
        (4.9022, 38.1, -44.45),
        (-28.575, 38.1, 44.45),
        (-28.575, 38.1, -44.45),
    ]]
    chamfer(chamfer9_edges, length=CHAMFER9_SIZE)

    # Chamfer3
    chamfer3_edges = [part.edges().sort_by_distance(p)[0] for p in [
        (0, 0, -63.5),
        (0, 6.35, -63.5),
        (82.55, 0, 0),
        (0, 0, 63.5),
        (-82.55, 0, 0),
        (78.830256121, 0, 59.780256121),
        (-78.830256121, 0, 59.780256121),
        (-78.830256121, 0, -59.780256121),
        (78.830256121, 0, -59.780256121),
        (82.55, 6.35, 0),
        (-82.55, 6.35, 0),
        (0, 6.35, 63.5),
        (78.830256121, 6.35, 59.780256121),
        (-78.830256121, 6.35, 59.780256121),
        (-78.830256121, 6.35, -59.780256121),
        (78.830256121, 6.35, -59.780256121),
    ]]
    chamfer(chamfer3_edges, length=CHAMFER3_SIZE)

    # Chamfer5
    chamfer5_edges = [part.edges().sort_by_distance(p)[0] for p in [
        (0, 101.6, 17.9578),
    ]]
    chamfer(chamfer5_edges, length=CHAMFER5_SIZE)

    # Chamfer6
    chamfer6_edges = [part.edges().sort_by_distance(p)[0] for p in [
        (0, 96.52, 17.9578),
    ]]
    chamfer(chamfer6_edges, length=CHAMFER6_SIZE)


with BuildPart() as body_2:
    # Split1: the piece on the far side of the plane
    add(part.part)
    split(bisect_by=Plane.ZX.offset(88.9), keep=Keep.BOTTOM)


with BuildPart() as part_1:
    add(part.part)

    # Split1
    split(bisect_by=Plane.ZX.offset(88.9), keep=Keep.TOP)


solid = Compound([body_2.part, part_1.part])
